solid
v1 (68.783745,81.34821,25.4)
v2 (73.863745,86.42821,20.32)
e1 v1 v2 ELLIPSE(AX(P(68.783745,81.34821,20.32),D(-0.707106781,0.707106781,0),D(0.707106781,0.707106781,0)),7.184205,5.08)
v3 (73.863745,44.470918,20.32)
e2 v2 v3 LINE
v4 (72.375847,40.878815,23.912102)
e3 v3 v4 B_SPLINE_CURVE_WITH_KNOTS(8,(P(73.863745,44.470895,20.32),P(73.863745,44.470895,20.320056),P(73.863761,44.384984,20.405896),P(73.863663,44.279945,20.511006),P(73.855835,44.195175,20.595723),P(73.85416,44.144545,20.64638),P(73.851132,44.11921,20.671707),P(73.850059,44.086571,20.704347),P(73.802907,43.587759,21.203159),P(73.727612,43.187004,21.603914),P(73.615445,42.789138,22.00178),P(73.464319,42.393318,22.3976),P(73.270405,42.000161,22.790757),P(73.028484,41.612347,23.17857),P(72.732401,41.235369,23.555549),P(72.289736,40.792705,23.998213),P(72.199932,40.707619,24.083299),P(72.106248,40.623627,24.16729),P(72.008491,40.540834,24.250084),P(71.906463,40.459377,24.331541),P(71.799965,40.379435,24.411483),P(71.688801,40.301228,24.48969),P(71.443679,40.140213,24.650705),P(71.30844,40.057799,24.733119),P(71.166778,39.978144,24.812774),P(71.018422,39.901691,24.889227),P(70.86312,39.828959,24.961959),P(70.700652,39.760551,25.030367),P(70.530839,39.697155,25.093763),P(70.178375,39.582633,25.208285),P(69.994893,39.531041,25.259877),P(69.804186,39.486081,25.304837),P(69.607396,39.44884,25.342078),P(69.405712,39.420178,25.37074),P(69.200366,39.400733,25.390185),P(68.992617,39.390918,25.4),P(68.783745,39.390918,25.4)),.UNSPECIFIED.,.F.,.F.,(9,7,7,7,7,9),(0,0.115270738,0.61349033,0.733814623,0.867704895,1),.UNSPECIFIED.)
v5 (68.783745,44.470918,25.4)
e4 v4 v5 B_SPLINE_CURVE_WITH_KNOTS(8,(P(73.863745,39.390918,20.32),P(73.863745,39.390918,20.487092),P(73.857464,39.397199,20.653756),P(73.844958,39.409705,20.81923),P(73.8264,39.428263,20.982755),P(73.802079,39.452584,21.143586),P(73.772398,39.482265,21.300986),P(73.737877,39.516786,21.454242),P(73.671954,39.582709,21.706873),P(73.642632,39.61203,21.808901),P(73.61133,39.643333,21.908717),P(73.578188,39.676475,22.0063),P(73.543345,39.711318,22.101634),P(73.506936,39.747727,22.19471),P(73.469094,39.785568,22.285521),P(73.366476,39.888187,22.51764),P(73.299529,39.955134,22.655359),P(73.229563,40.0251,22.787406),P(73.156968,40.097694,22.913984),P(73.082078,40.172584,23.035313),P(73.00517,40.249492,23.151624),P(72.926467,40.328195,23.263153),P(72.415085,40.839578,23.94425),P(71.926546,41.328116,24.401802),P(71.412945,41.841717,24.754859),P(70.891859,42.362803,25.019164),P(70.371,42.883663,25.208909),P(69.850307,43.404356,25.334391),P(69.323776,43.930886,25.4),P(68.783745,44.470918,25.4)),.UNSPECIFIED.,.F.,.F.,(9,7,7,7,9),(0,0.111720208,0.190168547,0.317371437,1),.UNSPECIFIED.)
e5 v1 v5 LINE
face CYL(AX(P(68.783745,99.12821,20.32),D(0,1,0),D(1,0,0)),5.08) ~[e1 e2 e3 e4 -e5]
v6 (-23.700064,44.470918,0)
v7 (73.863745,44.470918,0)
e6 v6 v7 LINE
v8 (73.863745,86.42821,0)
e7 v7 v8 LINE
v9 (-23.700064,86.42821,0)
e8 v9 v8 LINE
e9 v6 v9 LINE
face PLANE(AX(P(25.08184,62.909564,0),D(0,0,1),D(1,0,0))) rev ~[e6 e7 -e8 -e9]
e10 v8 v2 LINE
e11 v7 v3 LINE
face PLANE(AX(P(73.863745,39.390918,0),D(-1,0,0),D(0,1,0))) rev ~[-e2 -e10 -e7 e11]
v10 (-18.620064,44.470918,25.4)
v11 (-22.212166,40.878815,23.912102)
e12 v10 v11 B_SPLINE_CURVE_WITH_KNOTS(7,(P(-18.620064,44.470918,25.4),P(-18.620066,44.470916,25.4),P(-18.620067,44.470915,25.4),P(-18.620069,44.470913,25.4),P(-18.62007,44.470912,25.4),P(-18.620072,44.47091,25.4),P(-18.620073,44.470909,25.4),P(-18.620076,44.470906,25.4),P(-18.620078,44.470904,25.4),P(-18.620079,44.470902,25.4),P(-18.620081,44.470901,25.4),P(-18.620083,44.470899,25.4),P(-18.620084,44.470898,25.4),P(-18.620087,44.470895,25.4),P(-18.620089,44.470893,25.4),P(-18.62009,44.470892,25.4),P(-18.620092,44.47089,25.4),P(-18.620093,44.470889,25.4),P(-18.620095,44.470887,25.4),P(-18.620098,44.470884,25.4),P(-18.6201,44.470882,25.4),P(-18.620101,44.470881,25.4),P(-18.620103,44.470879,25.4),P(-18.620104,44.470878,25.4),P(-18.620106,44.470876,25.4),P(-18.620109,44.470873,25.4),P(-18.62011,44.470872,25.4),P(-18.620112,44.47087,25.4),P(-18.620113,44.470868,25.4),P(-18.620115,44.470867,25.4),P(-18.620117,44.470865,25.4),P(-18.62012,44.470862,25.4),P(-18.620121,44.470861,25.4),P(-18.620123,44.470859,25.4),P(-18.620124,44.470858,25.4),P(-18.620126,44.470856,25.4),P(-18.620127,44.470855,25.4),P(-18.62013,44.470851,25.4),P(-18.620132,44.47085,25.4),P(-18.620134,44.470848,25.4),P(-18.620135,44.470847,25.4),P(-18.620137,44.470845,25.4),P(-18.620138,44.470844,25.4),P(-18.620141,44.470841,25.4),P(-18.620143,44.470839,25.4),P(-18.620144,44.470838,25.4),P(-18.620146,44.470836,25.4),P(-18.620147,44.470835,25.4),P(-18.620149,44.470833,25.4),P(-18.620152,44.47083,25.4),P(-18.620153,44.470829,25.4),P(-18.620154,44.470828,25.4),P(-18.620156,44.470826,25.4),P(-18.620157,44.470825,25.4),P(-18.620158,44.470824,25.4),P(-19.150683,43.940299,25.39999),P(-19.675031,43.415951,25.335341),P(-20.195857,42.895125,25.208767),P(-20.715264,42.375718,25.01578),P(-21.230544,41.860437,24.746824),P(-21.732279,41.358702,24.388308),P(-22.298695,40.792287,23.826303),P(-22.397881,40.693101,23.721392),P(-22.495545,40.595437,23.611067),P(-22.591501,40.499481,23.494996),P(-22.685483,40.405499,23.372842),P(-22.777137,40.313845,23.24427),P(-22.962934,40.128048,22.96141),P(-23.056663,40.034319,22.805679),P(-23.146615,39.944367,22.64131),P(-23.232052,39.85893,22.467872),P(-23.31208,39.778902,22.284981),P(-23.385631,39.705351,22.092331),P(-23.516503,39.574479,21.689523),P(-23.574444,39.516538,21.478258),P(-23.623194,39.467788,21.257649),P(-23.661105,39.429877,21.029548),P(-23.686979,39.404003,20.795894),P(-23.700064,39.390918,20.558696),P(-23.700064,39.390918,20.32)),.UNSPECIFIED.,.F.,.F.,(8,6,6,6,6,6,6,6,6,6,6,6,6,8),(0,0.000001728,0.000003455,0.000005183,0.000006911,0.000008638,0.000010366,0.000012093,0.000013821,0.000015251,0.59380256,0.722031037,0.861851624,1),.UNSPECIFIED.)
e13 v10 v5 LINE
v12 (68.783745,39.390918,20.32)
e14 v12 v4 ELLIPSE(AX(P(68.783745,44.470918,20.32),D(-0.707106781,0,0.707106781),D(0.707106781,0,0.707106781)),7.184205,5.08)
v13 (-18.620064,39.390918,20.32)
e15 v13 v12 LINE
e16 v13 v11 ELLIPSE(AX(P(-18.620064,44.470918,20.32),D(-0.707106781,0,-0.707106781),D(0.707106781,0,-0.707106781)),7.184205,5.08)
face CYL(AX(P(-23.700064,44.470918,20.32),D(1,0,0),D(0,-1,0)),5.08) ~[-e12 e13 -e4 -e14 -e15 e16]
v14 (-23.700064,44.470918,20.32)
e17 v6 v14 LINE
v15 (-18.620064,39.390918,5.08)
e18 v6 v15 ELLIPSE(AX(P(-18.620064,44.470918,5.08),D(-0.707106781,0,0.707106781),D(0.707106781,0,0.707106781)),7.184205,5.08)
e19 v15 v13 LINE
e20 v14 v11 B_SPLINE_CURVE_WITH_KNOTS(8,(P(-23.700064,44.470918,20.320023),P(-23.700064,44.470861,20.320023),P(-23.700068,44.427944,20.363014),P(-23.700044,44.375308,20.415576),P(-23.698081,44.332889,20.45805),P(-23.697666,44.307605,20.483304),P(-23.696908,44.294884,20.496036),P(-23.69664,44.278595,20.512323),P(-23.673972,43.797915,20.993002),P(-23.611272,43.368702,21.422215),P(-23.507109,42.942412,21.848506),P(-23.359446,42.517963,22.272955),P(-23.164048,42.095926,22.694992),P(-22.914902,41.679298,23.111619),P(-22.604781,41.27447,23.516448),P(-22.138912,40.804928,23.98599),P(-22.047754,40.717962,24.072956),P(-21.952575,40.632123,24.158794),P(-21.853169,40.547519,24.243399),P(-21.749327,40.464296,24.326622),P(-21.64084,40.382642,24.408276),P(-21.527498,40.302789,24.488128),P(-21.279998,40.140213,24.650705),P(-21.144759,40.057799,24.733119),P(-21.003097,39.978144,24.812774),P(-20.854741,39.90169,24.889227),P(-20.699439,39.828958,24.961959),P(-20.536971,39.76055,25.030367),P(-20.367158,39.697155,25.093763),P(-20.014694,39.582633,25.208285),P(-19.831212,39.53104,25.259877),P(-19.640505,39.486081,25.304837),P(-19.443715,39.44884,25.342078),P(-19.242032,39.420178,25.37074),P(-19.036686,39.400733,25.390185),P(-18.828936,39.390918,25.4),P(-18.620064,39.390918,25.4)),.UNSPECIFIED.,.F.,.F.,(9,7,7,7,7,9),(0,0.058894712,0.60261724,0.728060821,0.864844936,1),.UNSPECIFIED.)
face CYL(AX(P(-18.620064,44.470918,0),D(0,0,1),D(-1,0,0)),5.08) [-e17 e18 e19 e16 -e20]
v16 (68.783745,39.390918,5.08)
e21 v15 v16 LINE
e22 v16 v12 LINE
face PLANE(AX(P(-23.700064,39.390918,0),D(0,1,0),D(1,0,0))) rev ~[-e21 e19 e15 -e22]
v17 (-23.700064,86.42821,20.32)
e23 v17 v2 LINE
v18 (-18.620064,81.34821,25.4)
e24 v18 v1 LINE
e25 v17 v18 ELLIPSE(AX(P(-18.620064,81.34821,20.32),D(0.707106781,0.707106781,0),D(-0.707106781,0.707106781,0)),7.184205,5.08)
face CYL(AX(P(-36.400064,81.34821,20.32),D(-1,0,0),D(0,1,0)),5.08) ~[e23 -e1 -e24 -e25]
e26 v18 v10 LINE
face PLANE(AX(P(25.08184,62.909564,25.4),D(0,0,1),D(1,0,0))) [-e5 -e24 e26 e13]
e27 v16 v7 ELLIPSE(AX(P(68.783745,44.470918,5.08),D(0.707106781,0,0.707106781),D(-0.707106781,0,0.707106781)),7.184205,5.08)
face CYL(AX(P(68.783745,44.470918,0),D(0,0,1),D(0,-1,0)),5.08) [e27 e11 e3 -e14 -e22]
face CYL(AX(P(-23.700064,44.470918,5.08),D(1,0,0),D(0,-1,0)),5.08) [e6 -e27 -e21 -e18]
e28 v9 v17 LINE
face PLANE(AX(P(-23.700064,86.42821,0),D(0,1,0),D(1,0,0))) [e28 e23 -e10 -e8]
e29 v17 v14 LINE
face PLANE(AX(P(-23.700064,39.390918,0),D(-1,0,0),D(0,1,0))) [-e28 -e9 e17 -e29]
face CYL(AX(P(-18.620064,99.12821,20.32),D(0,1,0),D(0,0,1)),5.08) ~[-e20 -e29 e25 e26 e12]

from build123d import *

# Parameters (mm, degrees)
F0_W        = 97.5638087839
F0_H        = 47.0372922719
F1_DEPTH    = 25.4
F2_R        = 5.08
F3_T1_DEPTH = 67.3572922719
F3_T3_DEPTH = 122.9638087839


# Not quite as in the source:
# - a fillet or chamfer that OpenCascade refuses, or shapes differently, is made with other operations: its cross-section is extruded or revolved along the edge and cut away or added


with BuildPart() as f1:
    # F0 (on Top) → F1 (new body)
    with BuildSketch(Plane.XY):
        with Locations((25.0818403438, 62.9095640033)):
            Rectangle(F0_W, F0_H)
    extrude(amount=F1_DEPTH)

    # F2
    f2_edges = [f1.edges().sort_by_distance(p)[0] for p in [
        (73.863745, 39.390918, 12.7),
        (25.08184, 39.390918, 25.4),
        (-23.700064, 39.390918, 12.7),
        (25.08184, 39.390918, 0),
    ]]
    fillet(f2_edges, radius=F2_R)

    # F3: fillet of radius 5.08 on 8 edges, made by hand

    # F3_s2 → F3_t1 (cut)
    with BuildSketch(Plane.XZ.offset(-99.1282101393)):
        with BuildLine():
            ThreePointArc((73.8637447357, 20.32), (72.3758471841, 23.9121024484), (68.7837447357, 25.4))
            Line((68.7837447357, 25.4), (73.8637447357, 25.4))
            Line((73.8637447357, 25.4), (73.8637447357, 20.32))
        make_face()
        with BuildLine():
            ThreePointArc((-18.6200640482, 25.4), (-22.2121664966, 23.9121024484), (-23.7000640482, 20.32))
            Line((-23.7000640482, 20.32), (-23.7000640482, 25.4))
            Line((-23.7000640482, 25.4), (-18.6200640482, 25.4))
        make_face()
    extrude(amount=F3_T1_DEPTH, mode=Mode.SUBTRACT)

    # F3_s4 → F3_t3 (cut)
    with BuildSketch(Plane.YZ.offset(-36.4000640482)):
        with BuildLine():
            ThreePointArc((86.4282101393, 20.32), (84.9403125877, 23.9121024484), (81.3482101393, 25.4))
            Line((81.3482101393, 25.4), (86.4282101393, 25.4))
            Line((86.4282101393, 25.4), (86.4282101393, 20.32))
        make_face()
    extrude(amount=F3_T3_DEPTH, mode=Mode.SUBTRACT)


solid = f1.part
